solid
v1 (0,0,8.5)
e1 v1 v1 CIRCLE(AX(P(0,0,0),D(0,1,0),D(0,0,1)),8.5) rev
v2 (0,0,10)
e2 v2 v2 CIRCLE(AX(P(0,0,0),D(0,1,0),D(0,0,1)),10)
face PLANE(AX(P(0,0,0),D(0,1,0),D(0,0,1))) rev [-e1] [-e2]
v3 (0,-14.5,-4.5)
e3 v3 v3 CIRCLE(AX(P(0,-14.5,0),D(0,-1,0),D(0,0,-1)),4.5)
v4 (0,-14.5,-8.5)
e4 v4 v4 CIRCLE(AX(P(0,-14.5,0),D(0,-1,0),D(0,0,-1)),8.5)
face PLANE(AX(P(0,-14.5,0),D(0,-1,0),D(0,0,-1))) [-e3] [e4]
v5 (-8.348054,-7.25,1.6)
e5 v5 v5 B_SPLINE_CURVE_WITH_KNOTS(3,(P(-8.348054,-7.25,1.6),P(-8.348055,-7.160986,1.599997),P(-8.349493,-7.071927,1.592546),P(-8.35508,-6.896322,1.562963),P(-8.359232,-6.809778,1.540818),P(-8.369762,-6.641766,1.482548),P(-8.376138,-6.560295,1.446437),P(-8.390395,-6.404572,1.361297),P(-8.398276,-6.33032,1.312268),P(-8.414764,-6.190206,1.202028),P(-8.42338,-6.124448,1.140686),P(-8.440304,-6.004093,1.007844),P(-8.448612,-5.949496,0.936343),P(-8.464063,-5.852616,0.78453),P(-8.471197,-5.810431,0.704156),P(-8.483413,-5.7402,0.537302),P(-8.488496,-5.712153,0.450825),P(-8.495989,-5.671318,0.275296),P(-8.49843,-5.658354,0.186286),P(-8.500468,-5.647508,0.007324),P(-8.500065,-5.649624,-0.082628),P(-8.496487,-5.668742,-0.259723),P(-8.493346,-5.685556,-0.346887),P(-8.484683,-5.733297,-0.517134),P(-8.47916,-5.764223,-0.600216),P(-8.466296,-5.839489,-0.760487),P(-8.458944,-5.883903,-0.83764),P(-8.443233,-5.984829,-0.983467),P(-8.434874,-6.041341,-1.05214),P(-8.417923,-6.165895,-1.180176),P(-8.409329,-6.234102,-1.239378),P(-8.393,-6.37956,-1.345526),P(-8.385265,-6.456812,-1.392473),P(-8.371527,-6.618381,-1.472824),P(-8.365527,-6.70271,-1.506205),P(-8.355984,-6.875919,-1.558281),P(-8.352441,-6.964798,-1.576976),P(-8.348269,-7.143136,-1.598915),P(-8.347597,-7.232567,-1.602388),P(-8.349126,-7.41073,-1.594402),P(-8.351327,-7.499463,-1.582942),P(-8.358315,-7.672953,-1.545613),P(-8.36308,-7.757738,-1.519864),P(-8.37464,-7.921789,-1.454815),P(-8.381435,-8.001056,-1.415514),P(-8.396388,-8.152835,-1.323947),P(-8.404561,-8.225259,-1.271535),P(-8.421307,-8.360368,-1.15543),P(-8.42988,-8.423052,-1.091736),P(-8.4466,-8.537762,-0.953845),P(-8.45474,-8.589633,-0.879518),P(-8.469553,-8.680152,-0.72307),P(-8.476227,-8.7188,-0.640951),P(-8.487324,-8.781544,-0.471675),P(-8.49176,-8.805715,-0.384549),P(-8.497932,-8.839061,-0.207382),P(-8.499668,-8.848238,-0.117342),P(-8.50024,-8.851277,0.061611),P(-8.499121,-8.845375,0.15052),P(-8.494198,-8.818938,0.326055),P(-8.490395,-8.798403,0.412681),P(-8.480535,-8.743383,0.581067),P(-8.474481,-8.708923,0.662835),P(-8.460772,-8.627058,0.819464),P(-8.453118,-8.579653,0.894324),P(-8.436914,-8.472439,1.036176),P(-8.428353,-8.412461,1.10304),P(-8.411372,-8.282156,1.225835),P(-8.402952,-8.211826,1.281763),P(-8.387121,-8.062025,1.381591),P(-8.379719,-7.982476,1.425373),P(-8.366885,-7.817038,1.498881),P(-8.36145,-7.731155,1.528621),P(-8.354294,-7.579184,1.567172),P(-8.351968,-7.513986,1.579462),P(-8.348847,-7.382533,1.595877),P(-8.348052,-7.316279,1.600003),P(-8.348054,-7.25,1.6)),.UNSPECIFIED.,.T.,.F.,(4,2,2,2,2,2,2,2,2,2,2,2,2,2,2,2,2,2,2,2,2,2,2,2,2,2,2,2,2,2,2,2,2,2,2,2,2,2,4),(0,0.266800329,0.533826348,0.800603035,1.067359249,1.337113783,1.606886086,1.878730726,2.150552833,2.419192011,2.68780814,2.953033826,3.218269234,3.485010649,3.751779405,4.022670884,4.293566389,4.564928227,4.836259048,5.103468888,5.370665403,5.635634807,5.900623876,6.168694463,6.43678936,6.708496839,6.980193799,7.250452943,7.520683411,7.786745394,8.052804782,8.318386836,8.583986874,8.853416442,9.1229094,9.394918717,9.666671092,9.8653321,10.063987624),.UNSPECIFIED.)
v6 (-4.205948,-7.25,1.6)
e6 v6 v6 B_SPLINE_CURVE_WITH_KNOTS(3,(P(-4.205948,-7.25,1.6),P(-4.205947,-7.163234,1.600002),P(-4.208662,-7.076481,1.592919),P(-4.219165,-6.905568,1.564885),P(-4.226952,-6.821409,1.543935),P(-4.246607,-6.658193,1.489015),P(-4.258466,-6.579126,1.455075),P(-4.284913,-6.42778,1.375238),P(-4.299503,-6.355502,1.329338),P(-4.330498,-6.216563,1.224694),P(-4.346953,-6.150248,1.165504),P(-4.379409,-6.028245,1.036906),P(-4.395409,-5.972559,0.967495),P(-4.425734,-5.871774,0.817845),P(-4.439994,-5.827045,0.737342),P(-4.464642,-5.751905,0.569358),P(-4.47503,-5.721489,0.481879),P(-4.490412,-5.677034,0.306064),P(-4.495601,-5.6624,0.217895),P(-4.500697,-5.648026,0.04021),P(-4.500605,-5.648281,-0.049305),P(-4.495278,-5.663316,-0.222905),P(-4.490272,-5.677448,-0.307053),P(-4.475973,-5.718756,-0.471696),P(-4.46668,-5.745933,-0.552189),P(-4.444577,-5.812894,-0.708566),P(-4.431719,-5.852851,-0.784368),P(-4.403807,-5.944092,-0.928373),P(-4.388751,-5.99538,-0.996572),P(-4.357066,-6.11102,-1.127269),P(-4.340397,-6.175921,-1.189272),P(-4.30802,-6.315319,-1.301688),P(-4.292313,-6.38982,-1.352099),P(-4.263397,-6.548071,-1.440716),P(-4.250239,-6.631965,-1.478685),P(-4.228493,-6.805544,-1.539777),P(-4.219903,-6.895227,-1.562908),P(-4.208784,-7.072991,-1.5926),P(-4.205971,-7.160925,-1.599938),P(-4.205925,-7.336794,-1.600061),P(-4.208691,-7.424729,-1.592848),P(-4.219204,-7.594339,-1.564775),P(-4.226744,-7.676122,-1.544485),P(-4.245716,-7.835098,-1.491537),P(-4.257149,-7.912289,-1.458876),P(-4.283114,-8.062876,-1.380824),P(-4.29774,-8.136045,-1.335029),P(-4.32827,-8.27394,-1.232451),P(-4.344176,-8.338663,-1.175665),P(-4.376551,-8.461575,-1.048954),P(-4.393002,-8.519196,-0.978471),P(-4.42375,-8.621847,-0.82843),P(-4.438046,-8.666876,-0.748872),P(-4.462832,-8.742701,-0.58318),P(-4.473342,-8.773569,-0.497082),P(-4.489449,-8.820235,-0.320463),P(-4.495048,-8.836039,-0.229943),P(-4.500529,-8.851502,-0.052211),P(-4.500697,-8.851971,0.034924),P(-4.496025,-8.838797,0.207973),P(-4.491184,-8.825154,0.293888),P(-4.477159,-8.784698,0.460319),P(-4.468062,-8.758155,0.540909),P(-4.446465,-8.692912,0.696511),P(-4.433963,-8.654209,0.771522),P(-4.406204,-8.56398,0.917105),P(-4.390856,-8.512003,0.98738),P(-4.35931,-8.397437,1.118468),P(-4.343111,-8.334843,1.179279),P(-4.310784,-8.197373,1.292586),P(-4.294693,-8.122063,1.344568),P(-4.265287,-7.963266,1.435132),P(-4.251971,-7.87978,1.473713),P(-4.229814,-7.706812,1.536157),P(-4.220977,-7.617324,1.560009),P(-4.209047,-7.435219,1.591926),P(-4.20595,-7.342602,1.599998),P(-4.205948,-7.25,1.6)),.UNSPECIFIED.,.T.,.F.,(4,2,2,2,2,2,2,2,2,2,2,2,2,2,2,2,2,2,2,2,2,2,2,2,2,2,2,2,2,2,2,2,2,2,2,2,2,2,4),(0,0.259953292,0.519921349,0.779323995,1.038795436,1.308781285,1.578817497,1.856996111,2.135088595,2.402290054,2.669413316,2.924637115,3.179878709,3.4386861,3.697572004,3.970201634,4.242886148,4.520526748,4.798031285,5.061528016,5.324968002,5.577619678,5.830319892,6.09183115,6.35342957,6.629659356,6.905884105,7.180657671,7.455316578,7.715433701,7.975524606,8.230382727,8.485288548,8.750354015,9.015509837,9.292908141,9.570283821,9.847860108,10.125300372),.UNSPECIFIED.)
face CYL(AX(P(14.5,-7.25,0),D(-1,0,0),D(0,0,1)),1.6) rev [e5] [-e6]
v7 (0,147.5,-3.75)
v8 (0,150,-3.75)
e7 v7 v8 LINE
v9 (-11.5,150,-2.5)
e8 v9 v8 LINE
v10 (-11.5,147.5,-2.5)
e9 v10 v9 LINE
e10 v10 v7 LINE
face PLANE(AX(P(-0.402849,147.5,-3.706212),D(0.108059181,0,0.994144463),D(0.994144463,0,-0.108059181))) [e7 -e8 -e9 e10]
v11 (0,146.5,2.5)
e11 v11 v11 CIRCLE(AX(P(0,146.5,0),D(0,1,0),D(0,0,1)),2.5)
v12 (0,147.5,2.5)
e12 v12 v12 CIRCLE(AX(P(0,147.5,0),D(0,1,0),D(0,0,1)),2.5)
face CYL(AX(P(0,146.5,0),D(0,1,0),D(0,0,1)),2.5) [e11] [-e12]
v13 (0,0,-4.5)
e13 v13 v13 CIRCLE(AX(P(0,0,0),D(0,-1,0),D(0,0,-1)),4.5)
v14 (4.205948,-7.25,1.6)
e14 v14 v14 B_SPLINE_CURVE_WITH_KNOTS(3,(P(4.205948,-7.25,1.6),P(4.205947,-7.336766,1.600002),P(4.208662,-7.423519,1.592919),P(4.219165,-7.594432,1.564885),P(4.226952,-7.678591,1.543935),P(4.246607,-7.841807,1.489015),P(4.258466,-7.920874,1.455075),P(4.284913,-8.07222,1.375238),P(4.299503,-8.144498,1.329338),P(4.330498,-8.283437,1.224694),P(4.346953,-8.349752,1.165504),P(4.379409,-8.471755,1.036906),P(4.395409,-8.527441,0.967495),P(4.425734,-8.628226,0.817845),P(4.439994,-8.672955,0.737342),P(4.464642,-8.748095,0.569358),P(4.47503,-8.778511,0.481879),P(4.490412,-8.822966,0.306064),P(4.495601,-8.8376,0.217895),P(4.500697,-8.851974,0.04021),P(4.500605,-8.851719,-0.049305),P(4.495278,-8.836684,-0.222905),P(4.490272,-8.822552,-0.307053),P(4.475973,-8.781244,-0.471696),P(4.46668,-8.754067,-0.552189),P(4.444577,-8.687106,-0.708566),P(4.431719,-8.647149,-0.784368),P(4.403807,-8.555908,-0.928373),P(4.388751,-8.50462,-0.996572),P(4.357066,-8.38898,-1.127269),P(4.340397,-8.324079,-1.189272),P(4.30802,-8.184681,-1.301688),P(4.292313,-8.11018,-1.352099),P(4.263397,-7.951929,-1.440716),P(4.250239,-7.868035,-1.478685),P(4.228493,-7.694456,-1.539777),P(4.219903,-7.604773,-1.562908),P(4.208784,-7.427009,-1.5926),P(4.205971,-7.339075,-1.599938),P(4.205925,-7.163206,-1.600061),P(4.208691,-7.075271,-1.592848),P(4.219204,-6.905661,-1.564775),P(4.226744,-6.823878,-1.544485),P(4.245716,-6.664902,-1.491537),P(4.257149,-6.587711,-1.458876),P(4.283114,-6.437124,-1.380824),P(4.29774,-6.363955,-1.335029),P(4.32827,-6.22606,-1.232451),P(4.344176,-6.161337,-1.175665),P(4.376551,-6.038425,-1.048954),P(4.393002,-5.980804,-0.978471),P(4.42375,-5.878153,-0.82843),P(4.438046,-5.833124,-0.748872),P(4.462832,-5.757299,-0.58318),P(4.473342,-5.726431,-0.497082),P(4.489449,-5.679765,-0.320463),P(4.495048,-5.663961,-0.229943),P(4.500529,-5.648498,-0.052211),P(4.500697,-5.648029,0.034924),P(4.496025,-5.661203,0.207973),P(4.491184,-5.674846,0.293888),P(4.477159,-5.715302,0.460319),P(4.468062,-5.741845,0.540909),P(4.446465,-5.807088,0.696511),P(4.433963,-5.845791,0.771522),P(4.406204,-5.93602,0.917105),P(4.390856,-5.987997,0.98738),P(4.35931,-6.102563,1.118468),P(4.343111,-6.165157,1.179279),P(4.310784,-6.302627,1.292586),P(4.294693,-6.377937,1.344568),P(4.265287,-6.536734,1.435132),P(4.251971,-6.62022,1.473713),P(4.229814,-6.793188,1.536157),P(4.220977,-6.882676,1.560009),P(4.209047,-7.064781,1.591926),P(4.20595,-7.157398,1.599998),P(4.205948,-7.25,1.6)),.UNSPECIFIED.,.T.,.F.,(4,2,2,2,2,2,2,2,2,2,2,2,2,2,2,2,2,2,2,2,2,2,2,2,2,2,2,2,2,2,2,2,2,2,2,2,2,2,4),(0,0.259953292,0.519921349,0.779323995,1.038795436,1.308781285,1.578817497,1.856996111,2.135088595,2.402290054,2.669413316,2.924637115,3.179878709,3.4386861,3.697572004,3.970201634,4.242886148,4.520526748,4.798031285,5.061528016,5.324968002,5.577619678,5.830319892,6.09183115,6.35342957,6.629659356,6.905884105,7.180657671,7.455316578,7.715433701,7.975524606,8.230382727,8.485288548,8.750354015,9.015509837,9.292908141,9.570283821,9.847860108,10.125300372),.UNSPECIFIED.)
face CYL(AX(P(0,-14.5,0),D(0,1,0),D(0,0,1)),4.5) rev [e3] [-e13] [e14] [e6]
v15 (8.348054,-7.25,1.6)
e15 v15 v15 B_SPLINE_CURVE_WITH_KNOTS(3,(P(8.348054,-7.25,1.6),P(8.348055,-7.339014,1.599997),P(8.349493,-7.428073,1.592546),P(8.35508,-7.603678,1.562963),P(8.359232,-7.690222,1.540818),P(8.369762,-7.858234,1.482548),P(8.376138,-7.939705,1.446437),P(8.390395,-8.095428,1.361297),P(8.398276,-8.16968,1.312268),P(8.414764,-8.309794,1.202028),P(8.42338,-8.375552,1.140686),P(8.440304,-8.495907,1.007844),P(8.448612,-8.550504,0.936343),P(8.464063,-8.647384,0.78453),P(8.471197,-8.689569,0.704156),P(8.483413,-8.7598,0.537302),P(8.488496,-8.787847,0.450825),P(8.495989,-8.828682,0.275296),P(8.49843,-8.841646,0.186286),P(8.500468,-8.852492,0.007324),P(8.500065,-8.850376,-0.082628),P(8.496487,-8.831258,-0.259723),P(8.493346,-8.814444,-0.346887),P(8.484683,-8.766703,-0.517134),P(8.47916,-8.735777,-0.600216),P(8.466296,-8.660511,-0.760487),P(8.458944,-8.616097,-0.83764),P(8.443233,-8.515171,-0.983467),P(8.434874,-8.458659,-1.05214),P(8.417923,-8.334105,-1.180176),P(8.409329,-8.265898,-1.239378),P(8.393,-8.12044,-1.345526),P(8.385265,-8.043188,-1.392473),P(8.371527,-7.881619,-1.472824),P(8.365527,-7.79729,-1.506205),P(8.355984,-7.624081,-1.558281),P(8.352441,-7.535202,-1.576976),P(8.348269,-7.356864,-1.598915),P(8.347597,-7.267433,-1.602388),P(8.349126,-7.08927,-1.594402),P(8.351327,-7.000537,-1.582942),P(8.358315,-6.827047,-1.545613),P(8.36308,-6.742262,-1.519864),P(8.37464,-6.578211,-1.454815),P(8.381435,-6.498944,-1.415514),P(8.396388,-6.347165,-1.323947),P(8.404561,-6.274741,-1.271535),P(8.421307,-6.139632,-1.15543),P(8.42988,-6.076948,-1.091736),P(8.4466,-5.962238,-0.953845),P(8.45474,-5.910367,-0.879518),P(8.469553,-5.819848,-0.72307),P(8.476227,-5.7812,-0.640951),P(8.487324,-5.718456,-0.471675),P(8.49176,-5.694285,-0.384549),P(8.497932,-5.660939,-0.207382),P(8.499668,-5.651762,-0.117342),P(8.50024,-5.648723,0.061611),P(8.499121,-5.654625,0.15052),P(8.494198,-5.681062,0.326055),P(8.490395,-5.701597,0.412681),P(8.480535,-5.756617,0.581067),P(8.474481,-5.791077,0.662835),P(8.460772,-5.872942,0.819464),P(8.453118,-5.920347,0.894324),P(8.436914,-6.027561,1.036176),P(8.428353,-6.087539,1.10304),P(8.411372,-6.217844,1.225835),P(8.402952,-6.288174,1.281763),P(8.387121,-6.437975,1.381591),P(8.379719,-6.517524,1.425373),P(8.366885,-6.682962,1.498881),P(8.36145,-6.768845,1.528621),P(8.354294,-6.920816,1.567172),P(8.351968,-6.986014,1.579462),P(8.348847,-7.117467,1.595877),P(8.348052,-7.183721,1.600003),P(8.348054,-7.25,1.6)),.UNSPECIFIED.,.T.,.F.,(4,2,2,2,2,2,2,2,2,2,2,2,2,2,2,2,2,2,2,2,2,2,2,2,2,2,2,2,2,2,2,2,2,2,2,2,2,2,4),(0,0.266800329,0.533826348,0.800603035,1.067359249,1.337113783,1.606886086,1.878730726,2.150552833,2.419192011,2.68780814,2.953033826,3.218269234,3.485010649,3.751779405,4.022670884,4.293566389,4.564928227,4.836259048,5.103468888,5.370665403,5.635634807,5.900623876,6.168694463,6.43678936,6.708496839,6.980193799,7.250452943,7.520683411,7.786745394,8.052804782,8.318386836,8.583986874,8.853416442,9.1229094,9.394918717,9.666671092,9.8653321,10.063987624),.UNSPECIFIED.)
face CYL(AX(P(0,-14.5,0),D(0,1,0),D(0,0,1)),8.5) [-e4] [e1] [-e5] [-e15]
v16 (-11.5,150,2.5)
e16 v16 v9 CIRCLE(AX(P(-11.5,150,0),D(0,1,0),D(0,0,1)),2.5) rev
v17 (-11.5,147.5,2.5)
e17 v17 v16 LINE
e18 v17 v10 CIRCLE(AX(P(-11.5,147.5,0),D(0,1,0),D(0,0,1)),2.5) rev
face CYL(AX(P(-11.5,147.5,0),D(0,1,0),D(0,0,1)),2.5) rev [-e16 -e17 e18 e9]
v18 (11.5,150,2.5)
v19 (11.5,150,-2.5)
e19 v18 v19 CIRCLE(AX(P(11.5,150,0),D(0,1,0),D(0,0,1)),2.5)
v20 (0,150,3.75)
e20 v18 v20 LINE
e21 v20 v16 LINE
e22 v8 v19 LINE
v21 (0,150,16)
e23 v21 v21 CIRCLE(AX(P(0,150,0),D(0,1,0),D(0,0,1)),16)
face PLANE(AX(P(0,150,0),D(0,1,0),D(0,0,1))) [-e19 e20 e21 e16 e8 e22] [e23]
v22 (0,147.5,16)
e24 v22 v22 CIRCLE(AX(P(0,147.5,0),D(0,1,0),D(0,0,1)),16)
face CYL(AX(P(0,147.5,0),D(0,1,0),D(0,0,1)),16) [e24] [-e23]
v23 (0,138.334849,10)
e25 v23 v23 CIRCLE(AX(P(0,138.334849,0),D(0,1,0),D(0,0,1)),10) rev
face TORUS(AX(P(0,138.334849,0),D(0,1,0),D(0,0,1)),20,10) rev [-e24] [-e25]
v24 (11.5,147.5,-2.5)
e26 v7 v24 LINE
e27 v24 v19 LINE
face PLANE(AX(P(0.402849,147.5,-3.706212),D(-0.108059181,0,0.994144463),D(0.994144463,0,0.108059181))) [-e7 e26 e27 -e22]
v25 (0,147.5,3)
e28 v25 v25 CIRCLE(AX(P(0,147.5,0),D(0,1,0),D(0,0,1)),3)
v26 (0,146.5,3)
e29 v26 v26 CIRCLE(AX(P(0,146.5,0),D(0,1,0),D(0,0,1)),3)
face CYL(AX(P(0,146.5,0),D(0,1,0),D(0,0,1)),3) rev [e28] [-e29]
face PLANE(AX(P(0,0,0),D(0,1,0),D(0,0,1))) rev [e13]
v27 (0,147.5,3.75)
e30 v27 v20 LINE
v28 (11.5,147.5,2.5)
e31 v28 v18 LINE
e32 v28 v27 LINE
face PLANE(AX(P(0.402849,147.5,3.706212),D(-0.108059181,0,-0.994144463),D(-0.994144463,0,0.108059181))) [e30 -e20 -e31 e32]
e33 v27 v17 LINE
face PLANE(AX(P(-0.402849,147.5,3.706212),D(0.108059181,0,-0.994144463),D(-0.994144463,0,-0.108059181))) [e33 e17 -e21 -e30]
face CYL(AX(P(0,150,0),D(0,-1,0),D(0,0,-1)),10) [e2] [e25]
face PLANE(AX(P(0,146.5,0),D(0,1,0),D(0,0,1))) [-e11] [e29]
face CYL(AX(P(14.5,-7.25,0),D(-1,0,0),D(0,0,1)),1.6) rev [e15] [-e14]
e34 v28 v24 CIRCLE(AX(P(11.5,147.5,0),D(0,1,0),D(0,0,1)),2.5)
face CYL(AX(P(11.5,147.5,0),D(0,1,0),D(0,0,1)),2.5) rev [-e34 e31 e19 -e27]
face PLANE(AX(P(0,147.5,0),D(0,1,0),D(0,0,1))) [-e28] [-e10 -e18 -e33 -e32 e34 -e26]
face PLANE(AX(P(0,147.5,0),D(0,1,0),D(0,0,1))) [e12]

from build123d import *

# Parameters (mm, degrees)
SKETCH1_R               = 10
BOSS_EXTRUDE1_DEPTH     = 150
SKETCH2_R               = 8.5
SKETCH2_R_2             = 4.5
BOSS_EXTRUDE2_DEPTH     = 14.5
CUT_EXTRUDE1_DEPTH      = 14.5
CUT_EXTRUDE1_DEPTH_BACK = 14.5
SKETCH3_R               = 1.6
SKETCH5_R               = 16
BOSS_EXTRUDE3_DEPTH     = 2.5
FILLET1_R               = 10
CUT_EXTRUDE2_DEPTH      = 2.5
SKETCH6_R               = 3
SKETCH6_R_2             = 2.5
CUT_EXTRUDE3_DEPTH      = 1


with BuildPart() as part:
    # Sketch1 → Boss-Extrude1 (new body)
    with BuildSketch(Plane(origin=(0, 0, 0), x_dir=(1, 0, 0), z_dir=(0, 1, 0))):
        with Locations(Location((0, 0, 0), (0, 0, 270))):
            Circle(SKETCH1_R)
    extrude(amount=BOSS_EXTRUDE1_DEPTH)

    # Sketch2 → Boss-Extrude2 (add)
    with BuildSketch(Plane.XZ):
        with Locations(Location((0, 0, 0), (0, 0, 90))):
            Circle(SKETCH2_R)
        with Locations(Location((0, 0, 0), (0, 0, 90))):
            Circle(SKETCH2_R_2, mode=Mode.SUBTRACT)
    extrude(amount=BOSS_EXTRUDE2_DEPTH)

    # Sketch3 → Cut-Extrude1 (cut, two sides: drawn at the far end of the back side and taken through both)
    with BuildSketch(Plane(origin=(0, 0, 0), x_dir=(0, 0, -1), z_dir=(1, 0, 0)).offset(-CUT_EXTRUDE1_DEPTH_BACK)):
        with Locations(Location((0, -7.25, 0), (0, 0, 180))):
            Circle(SKETCH3_R)
    extrude(amount=CUT_EXTRUDE1_DEPTH + CUT_EXTRUDE1_DEPTH_BACK, mode=Mode.SUBTRACT)

    # Sketch5 → Boss-Extrude3 (add)
    with BuildSketch(Plane(origin=(0, 150, 0), x_dir=(1, 0, 0), z_dir=(0, 1, 0))):
        with Locations(Location((0, 0, 0), (0, 0, 270))):
            Circle(SKETCH5_R)
    extrude(amount=-BOSS_EXTRUDE3_DEPTH)

    # Fillet1
    # the kernel refuses this fillet: 10 mm, written as the material it adds along each edge
    with BuildSketch(Plane(origin=(0, 147.5, 0), x_dir=(0, 0, 1), z_dir=(1, 0, 0))) as fillet1_piece_1:
        with BuildLine():
            CenterArc((20, 9.16515139), FILLET1_R, 180, 66.421821522)
            Line((16, 0), (15.92, -0.183303028))
            ThreePointArc((15.92, -0.183303028), (13, -0.2), (10, -0.2))
            Line((10, -0.2), (9.8, 0))
            Line((9.8, 0), (9.8, 9.16515139))
            Line((9.8, 9.16515139), (10, 9.16515139))
        make_face()
    revolve(axis=Axis((0, 147.5, 0), (0, -1, 0)))

    # Sketch4 → Cut-Extrude2 (cut)
    with BuildSketch(Plane(origin=(0, 150, 0), x_dir=(1, 0, 0), z_dir=(0, 1, 0))):
        with BuildLine():
            ThreePointArc((-11.5, 2.5), (-13.267766953, 1.767766953), (-14, 0))
            Line((-14, 0), (-9, 0))
            ThreePointArc((-9, 0), (-9.732233047, 1.767766953), (-11.5, 2.5))
        make_face()
        with BuildLine():
            Line((-9, 0), (-14, 0))
            ThreePointArc((-14, 0), (-13.267766953, -1.767766953), (-11.5, -2.5))
            ThreePointArc((-11.5, -2.5), (-9.732233047, -1.767766953), (-9, 0))
        make_face()
        with BuildLine():
            Line((-3.75, 0), (-9, 0))
            ThreePointArc((-9, 0), (-9.732233047, -1.767766953), (-11.5, -2.5))
            Line((-11.5, -2.5), (-0.805698272, -3.662424101))
            ThreePointArc((-0.805698272, -3.662424101), (-2.922658766, -2.349588419), (-3.75, 0))
        make_face()
        with BuildLine():
            ThreePointArc((-11.5, 2.5), (-9.732233047, 1.767766953), (-9, 0))
            Line((-9, 0), (-3.75, 0))
            ThreePointArc((-3.75, 0), (-2.922658766, 2.349588419), (-0.805698272, 3.662424101))
            Line((-0.805698272, 3.662424101), (-11.5, 2.5))
        make_face()
        with BuildLine():
            ThreePointArc((-0.805698272, 3.662424101), (-2.922658766, 2.349588419), (-3.75, 0))
            Line((-3.75, 0), (0, 0))
            Line((0, 0), (0, 3.75))
            Line((0, 3.75), (-0.805698272, 3.662424101))
        make_face()
        with BuildLine():
            Line((0, 0), (-3.75, 0))
            ThreePointArc((-3.75, 0), (-2.922658766, -2.349588419), (-0.805698272, -3.662424101))
            Line((-0.805698272, -3.662424101), (0, -3.75))
            Line((0, -3.75), (0.805698272, -3.662424101))
            ThreePointArc((0.805698272, -3.662424101), (2.922658766, -2.349588419), (3.75, 0))
            Line((3.75, 0), (0, 0))
        make_face()
        with BuildLine():
            Line((0, 3.75), (0, 0))
            Line((0, 0), (3.75, 0))
            ThreePointArc((3.75, 0), (2.922658766, 2.349588419), (0.805698272, 3.662424101))
            Line((0.805698272, 3.662424101), (0, 3.75))
        make_face()
        with BuildLine():
            ThreePointArc((0.805698272, 3.662424101), (2.922658766, 2.349588419), (3.75, 0))
            Line((3.75, 0), (9, 0))
            ThreePointArc((9, 0), (9.732233047, 1.767766953), (11.5, 2.5))
            Line((11.5, 2.5), (0.805698272, 3.662424101))
        make_face()
        with BuildLine():
            Line((9, 0), (3.75, 0))
            ThreePointArc((3.75, 0), (2.922658766, -2.349588419), (0.805698272, -3.662424101))
            Line((0.805698272, -3.662424101), (11.5, -2.5))
            ThreePointArc((11.5, -2.5), (9.732233047, -1.767766953), (9, 0))
        make_face()
        with BuildLine():
            ThreePointArc((11.5, 2.5), (9.732233047, 1.767766953), (9, 0))
            Line((9, 0), (11.5, 0))
            Line((11.5, 0), (11.5, 2.5))
        make_face()
        with BuildLine():
            Line((11.5, 0), (9, 0))
            ThreePointArc((9, 0), (9.732233047, -1.767766953), (11.5, -2.5))
            Line((11.5, -2.5), (11.5, 0))
        make_face()
        with BuildLine():
            ThreePointArc((14, 0), (13.267766953, 1.767766953), (11.5, 2.5))
            Line((11.5, 2.5), (11.5, 0))
            Line((11.5, 0), (14, 0))
        make_face()
        with BuildLine():
            Line((11.5, 0), (11.5, -2.5))
            ThreePointArc((11.5, -2.5), (13.267766953, -1.767766953), (14, 0))
            Line((14, 0), (11.5, 0))
        make_face()
    extrude(amount=-CUT_EXTRUDE2_DEPTH, mode=Mode.SUBTRACT)

    # Sketch6 → Cut-Extrude3 (cut)
    with BuildSketch(Plane(origin=(0, 147.5, 0), x_dir=(1, 0, 0), z_dir=(0, 1, 0))):
        with Locations(Location((0, 0, 0), (0, 0, 270))):
            Circle(SKETCH6_R)
        with Locations(Location((0, 0, 0), (0, 0, 270))):
            Circle(SKETCH6_R_2, mode=Mode.SUBTRACT)
    extrude(amount=-CUT_EXTRUDE3_DEPTH, mode=Mode.SUBTRACT)


solid = part.part
